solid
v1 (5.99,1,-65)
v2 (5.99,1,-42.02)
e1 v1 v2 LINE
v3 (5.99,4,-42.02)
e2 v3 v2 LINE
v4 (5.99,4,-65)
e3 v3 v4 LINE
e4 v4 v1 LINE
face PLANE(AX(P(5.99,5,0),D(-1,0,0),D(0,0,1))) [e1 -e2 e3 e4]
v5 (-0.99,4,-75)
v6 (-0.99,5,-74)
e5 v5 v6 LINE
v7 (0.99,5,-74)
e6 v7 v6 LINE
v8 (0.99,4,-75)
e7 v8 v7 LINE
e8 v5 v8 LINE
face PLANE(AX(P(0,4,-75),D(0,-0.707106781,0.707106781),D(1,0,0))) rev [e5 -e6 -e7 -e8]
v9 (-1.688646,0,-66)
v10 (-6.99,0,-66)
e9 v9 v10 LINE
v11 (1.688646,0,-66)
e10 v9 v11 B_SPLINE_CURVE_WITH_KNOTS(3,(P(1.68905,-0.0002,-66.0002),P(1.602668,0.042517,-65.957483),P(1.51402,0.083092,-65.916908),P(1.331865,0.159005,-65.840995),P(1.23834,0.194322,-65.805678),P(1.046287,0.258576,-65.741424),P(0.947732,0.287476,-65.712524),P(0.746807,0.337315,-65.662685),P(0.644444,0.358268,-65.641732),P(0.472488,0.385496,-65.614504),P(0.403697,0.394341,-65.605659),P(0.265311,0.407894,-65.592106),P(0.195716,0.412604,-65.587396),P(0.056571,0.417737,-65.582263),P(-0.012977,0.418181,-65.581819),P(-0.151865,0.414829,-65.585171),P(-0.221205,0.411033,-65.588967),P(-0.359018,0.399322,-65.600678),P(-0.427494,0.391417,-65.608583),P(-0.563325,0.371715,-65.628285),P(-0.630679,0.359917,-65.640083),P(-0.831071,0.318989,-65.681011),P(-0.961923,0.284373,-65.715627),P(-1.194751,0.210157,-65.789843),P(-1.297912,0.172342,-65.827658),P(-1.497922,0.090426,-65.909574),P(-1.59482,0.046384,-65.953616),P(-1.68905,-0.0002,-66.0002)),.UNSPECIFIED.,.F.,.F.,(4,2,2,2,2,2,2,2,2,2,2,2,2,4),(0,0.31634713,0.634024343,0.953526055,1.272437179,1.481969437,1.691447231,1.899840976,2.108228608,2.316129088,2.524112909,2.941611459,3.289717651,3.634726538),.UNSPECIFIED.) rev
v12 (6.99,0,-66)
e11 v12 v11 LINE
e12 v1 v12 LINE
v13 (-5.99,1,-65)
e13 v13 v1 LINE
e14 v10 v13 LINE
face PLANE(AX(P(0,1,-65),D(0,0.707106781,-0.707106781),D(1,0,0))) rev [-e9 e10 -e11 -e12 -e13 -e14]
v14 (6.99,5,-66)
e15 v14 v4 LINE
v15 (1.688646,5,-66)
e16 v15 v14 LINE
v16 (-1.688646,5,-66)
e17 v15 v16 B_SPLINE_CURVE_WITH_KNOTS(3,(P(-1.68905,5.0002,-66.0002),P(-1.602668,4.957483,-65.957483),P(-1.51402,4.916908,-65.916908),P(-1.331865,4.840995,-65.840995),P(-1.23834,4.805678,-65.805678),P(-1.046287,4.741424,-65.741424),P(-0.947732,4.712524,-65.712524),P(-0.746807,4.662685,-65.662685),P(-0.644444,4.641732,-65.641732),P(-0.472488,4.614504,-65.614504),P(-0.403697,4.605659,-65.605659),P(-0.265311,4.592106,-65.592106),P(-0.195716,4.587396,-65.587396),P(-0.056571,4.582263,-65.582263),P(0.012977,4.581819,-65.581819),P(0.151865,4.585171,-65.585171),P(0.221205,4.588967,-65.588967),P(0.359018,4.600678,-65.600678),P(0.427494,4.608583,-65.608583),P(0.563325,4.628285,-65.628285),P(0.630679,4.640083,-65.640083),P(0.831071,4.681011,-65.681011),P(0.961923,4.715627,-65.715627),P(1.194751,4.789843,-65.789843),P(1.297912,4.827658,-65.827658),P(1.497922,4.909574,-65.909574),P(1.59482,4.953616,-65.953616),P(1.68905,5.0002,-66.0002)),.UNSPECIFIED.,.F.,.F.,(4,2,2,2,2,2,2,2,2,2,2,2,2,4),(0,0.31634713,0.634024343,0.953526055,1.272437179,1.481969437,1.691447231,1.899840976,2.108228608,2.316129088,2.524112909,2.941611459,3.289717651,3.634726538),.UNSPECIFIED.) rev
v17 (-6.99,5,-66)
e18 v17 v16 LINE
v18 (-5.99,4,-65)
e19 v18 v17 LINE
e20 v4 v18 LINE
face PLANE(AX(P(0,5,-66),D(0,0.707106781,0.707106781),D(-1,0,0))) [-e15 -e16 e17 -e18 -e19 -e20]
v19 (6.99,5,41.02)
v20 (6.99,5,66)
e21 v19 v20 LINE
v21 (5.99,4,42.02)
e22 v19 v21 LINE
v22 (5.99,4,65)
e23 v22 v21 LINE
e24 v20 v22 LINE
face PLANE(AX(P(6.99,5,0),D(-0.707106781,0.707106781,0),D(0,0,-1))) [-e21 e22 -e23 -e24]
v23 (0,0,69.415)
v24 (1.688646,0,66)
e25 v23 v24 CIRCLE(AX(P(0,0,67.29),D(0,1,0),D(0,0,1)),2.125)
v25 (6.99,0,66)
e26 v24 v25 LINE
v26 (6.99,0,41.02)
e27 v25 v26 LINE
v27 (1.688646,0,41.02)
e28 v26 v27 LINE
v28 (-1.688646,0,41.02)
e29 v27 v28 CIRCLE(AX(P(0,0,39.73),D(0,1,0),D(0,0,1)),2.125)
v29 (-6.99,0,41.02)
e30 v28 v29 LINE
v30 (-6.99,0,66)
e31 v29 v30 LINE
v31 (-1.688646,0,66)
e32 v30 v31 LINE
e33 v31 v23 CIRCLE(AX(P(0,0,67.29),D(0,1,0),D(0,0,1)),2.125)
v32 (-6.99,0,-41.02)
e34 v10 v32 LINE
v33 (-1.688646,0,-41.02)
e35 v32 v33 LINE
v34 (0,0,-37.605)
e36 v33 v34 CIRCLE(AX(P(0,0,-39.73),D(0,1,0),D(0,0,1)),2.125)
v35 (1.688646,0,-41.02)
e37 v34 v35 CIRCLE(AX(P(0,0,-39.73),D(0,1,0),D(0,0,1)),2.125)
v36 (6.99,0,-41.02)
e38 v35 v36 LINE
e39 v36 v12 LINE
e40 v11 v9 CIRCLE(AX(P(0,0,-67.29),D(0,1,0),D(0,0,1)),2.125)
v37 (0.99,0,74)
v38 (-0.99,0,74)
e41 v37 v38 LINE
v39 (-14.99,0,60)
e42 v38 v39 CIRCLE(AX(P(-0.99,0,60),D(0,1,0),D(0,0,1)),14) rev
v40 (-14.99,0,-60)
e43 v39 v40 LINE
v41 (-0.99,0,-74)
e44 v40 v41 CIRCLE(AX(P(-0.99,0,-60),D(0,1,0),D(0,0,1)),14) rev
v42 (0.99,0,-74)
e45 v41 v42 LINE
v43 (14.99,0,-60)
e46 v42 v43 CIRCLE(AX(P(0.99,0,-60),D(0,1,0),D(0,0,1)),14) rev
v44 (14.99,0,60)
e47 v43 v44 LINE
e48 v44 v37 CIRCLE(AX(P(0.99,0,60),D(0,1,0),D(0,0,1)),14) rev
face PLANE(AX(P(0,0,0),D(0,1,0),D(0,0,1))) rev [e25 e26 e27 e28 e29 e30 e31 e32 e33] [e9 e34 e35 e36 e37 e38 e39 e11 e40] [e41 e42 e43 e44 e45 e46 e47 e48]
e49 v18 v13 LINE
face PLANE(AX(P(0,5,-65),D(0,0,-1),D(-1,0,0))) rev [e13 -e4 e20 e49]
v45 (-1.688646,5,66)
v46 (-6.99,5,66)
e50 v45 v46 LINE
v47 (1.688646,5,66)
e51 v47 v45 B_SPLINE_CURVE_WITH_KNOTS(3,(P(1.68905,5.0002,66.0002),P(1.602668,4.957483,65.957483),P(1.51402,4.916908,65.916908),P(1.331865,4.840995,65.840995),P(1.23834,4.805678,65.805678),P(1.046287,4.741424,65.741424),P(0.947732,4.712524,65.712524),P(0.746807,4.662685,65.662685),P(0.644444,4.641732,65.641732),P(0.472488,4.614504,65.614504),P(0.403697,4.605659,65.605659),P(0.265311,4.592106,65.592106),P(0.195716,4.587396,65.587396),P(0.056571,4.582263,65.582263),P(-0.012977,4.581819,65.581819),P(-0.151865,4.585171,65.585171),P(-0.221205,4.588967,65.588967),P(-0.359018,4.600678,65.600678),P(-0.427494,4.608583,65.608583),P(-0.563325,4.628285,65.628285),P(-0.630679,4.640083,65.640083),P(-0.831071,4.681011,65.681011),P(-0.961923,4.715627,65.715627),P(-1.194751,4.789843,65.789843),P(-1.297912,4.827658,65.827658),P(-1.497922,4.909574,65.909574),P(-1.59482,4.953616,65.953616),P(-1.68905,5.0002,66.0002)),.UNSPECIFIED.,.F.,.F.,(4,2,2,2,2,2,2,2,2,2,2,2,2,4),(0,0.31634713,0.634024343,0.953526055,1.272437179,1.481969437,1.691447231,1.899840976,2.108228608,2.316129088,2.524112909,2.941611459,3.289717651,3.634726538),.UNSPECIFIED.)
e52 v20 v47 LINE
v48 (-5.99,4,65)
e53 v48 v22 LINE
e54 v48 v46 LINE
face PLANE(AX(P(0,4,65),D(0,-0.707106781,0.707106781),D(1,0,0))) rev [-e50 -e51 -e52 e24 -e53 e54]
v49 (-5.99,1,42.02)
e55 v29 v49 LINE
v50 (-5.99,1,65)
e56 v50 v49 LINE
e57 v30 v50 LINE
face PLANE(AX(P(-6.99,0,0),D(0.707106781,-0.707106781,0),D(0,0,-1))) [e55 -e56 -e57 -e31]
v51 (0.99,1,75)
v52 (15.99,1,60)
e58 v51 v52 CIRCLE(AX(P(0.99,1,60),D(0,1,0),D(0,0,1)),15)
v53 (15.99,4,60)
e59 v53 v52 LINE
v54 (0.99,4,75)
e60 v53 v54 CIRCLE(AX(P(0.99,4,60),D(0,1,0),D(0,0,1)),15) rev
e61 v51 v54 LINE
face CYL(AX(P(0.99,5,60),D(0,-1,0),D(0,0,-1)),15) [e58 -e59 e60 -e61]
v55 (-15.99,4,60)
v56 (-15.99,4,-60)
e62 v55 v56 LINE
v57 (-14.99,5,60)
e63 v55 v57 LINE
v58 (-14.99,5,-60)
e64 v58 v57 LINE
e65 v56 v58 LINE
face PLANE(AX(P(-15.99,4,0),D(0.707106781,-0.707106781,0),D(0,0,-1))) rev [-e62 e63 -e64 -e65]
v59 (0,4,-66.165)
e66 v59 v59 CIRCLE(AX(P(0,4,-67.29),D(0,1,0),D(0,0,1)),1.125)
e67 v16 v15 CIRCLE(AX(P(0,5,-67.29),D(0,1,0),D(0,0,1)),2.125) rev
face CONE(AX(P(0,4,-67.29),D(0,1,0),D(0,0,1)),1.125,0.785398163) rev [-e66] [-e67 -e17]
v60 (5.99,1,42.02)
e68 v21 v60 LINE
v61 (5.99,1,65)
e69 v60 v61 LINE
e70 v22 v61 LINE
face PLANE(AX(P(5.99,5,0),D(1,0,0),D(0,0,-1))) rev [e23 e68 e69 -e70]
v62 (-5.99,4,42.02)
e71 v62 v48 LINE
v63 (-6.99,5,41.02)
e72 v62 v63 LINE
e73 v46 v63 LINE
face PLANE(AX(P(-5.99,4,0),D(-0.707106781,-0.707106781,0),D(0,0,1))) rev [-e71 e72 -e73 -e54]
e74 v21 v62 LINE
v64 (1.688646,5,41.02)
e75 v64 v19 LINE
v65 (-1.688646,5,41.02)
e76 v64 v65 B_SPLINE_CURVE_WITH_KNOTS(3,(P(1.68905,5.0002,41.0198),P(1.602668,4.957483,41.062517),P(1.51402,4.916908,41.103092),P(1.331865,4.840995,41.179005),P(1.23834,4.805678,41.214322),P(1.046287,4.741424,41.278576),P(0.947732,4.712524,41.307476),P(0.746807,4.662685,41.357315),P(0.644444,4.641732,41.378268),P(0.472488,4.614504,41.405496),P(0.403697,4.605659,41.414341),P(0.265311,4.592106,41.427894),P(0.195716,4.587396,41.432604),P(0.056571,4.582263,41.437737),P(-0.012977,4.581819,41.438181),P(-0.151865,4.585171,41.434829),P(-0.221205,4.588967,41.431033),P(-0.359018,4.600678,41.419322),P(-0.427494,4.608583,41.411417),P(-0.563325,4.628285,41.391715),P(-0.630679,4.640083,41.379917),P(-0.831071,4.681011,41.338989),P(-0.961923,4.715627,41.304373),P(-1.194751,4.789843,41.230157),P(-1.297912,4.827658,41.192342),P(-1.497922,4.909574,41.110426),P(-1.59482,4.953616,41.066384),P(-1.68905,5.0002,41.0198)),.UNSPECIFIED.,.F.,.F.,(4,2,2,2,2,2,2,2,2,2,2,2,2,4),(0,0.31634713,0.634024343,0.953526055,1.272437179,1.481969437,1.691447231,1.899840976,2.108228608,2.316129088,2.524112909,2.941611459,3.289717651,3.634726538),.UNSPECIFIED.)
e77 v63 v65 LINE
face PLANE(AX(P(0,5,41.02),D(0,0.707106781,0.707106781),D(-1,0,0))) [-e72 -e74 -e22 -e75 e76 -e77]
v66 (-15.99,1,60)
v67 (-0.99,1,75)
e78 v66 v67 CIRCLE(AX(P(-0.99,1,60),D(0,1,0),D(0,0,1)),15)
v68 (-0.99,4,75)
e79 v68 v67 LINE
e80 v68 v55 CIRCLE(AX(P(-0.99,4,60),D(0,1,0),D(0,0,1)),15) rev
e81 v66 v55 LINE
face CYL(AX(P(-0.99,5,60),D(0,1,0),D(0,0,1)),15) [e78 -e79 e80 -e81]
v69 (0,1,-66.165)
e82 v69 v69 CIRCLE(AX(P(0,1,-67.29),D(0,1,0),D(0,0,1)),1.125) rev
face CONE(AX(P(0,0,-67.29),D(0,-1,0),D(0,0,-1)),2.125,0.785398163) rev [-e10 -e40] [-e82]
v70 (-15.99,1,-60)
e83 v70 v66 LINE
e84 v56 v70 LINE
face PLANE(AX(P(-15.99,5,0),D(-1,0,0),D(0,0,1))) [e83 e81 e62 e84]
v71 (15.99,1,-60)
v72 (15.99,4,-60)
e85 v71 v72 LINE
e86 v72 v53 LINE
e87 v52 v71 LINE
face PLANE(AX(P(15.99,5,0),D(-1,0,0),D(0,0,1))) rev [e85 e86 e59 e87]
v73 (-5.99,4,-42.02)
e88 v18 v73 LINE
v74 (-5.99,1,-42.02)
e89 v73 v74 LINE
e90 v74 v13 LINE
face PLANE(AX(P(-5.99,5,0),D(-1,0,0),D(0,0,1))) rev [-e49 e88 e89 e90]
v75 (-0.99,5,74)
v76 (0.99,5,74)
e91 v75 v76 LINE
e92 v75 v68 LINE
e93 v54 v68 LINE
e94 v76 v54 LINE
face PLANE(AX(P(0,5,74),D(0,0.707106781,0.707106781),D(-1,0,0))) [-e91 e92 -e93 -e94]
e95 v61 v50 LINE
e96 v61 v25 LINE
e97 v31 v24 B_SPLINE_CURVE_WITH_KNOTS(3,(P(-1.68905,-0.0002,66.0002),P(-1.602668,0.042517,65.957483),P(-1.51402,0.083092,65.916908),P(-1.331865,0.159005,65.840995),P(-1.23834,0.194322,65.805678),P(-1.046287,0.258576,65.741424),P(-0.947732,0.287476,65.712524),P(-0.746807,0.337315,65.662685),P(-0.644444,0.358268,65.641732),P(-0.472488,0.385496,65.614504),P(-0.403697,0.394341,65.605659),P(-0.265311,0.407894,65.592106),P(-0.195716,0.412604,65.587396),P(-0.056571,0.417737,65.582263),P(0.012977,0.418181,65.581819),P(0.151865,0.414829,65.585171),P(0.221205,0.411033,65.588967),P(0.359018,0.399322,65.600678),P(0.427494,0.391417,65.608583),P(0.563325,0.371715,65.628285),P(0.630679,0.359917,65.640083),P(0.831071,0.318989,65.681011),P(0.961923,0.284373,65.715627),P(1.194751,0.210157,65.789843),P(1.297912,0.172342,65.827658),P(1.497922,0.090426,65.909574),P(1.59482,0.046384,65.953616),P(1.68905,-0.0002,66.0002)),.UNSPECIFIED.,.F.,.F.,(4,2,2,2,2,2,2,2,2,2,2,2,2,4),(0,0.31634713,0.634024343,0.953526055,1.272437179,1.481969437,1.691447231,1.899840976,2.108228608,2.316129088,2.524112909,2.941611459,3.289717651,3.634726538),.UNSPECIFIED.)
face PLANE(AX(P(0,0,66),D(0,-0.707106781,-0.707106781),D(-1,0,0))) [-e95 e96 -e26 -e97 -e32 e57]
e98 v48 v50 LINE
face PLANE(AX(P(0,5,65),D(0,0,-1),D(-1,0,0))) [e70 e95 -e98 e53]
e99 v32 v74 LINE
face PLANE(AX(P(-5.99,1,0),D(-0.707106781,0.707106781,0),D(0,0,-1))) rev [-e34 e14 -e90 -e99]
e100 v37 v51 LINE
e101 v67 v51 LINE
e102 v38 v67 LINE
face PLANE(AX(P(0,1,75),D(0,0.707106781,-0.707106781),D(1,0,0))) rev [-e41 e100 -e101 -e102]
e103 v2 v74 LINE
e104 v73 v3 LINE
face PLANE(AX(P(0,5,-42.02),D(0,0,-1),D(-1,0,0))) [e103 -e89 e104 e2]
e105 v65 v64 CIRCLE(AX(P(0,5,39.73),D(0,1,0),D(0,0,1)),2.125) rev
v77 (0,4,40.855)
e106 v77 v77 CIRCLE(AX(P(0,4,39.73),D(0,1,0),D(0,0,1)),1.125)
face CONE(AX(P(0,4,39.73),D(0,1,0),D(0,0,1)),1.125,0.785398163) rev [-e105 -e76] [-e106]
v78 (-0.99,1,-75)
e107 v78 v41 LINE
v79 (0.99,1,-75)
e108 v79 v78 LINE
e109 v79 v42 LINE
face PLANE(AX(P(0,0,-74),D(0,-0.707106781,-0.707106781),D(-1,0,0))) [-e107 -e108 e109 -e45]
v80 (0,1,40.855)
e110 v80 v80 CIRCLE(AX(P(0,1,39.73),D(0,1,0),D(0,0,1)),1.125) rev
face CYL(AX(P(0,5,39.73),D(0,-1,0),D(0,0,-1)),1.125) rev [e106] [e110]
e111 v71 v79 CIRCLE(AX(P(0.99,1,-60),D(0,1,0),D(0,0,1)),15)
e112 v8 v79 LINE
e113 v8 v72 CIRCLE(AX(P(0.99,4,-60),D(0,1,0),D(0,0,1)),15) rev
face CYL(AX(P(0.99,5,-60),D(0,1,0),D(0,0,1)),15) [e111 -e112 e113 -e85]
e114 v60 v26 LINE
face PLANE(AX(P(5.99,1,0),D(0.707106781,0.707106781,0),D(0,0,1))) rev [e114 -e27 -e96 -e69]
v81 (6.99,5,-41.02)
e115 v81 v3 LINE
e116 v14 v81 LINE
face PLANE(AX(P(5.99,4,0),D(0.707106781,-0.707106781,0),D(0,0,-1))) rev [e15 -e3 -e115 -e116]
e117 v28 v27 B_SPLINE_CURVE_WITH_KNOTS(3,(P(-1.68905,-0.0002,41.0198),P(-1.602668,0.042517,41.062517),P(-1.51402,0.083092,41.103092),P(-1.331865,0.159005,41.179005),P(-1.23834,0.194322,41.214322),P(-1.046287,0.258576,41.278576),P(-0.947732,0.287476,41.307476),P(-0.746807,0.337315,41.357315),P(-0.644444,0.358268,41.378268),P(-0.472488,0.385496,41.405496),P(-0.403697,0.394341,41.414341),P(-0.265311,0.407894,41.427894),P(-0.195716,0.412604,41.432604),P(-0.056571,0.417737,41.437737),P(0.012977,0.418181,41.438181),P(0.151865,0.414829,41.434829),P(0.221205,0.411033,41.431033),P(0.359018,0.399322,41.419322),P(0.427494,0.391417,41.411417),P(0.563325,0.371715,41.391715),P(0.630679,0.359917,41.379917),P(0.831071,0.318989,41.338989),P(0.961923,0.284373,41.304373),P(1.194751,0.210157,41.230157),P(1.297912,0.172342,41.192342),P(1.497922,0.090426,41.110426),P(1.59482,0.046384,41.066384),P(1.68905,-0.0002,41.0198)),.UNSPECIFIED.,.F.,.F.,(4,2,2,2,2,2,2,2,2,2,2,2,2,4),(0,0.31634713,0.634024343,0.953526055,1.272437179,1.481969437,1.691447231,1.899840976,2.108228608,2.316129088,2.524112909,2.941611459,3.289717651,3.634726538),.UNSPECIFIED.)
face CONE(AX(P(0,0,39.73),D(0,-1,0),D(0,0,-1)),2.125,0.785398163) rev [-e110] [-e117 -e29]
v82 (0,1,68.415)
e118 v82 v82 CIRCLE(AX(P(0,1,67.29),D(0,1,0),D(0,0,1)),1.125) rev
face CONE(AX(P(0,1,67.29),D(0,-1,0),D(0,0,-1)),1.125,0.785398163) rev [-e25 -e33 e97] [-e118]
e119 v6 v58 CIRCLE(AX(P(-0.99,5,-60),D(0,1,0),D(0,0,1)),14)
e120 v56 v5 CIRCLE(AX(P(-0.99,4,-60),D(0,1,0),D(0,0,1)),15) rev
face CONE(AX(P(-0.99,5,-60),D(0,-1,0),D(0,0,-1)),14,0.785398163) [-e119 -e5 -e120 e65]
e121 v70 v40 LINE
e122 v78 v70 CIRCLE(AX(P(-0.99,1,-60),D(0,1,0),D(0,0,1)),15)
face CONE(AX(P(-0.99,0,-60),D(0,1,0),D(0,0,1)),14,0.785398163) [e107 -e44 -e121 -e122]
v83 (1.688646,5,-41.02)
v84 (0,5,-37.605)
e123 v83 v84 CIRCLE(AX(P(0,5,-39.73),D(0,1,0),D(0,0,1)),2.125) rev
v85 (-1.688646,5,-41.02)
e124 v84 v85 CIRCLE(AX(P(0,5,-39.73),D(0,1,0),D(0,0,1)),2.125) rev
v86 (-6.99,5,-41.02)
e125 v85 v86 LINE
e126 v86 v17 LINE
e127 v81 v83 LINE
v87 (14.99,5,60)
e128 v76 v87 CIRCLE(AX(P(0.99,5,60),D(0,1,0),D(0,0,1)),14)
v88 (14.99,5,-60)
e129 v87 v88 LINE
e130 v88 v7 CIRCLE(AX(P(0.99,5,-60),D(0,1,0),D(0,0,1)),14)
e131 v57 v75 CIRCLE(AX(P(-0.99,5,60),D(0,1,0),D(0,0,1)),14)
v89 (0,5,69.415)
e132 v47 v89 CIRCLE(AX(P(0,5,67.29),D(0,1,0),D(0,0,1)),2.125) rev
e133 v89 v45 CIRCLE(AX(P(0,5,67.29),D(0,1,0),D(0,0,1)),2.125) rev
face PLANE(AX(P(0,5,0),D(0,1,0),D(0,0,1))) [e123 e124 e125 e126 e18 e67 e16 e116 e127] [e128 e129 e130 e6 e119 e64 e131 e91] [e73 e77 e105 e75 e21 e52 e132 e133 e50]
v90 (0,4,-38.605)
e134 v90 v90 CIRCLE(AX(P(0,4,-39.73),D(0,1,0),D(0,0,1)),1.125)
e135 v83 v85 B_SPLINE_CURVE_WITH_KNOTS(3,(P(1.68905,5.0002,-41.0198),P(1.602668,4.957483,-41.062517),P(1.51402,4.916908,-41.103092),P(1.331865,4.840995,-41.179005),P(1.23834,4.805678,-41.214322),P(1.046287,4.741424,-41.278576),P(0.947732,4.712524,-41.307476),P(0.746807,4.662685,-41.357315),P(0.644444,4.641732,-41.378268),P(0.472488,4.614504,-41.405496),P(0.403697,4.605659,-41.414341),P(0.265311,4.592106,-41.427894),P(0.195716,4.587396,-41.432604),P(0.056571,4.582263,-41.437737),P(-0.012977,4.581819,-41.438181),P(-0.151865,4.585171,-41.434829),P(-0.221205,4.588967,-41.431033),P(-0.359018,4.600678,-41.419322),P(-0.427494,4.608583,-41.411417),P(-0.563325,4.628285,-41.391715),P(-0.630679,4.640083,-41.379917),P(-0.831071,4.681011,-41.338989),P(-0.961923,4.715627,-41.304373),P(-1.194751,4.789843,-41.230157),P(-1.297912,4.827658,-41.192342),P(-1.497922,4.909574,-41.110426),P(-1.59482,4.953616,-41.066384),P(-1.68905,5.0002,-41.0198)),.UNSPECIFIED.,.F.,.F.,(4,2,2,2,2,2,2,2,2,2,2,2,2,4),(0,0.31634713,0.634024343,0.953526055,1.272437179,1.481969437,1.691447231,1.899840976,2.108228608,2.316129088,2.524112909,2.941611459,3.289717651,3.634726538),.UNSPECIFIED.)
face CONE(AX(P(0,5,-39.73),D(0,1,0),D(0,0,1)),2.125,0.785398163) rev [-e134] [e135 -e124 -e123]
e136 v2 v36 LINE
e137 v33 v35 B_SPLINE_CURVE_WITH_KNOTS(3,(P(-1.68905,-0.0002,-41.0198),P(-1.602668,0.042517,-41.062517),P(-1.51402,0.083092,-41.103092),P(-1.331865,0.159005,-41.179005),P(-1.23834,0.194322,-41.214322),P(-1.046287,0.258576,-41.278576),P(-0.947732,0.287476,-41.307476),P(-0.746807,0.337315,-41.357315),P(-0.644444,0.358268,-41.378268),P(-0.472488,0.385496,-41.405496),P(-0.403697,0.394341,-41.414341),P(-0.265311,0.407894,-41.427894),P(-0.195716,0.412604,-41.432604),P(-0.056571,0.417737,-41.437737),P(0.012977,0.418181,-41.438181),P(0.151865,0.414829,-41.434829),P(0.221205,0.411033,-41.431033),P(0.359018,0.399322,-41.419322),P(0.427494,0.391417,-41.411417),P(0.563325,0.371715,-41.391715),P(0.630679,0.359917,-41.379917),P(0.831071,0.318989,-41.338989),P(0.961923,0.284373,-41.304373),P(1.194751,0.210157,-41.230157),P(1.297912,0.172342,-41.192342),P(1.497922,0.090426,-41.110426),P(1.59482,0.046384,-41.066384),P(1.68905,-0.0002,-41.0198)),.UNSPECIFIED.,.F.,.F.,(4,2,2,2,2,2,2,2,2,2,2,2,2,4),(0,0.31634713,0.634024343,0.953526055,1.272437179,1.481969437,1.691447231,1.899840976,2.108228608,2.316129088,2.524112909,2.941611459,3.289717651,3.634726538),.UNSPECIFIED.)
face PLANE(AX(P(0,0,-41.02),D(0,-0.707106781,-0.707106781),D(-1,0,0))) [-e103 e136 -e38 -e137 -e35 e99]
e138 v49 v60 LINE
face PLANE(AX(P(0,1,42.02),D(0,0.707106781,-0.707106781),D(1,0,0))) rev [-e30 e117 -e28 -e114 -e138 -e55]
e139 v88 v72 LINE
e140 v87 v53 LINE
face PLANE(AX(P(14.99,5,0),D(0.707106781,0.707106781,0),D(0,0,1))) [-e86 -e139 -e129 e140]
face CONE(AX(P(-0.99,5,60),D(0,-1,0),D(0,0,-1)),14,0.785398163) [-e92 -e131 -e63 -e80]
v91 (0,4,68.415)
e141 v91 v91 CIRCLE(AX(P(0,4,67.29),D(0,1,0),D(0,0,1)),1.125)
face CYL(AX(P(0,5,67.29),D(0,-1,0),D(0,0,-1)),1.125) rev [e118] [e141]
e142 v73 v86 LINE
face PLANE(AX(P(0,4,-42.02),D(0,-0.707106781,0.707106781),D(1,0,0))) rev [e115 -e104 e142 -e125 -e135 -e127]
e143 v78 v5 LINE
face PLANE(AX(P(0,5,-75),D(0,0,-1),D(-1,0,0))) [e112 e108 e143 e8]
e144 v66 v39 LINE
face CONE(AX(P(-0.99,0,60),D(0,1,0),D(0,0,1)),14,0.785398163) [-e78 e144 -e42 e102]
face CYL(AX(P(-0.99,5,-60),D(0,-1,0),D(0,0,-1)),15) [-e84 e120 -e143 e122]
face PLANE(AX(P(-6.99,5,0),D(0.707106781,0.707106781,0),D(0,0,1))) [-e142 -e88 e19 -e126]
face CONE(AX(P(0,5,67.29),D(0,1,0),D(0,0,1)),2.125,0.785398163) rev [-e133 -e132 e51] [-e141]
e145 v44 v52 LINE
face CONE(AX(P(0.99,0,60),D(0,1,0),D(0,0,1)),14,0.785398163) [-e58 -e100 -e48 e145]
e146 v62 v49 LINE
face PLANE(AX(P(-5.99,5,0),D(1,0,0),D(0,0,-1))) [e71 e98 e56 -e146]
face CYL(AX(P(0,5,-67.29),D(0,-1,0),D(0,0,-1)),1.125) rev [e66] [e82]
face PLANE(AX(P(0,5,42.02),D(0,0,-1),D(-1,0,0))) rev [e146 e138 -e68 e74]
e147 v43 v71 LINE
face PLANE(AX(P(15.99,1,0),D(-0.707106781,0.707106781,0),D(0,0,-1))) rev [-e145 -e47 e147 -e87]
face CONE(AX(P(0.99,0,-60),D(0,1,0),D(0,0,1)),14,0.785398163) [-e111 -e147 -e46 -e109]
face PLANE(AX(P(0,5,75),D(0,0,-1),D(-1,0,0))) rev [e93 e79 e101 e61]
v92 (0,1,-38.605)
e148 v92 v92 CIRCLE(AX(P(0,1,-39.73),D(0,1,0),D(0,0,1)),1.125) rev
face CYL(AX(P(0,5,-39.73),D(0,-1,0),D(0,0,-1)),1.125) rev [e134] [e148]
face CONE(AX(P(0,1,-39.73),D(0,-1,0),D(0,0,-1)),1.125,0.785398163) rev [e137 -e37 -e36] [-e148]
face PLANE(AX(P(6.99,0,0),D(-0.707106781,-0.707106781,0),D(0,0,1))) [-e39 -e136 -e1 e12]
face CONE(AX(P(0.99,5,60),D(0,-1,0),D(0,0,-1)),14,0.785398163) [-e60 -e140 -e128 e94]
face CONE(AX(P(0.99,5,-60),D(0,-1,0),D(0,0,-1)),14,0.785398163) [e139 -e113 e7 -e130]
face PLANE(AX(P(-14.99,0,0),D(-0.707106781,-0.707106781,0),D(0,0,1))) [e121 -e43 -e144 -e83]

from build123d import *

# Parameters (mm, degrees)
SKETCH3_W           = 31.98
SKETCH3_H           = 150
SKETCH3_R           = 1.125
SKETCH3_W_2         = 11.98
SKETCH3_H_2         = 22.98
BOSS_EXTRUDE1_DEPTH = 5
FILLET1_R           = 15
CHAMFER1_SIZE       = 1


with BuildPart() as part:
    # Sketch3 → Boss-Extrude1 (new body)
    with BuildSketch(Plane(origin=(0, 0, 0), x_dir=(1, 0, 0), z_dir=(0, 1, 0))):
        Rectangle(SKETCH3_W, SKETCH3_H)
        with Locations(Location((0, 67.29, 0), (0, 0, 270))):
            Circle(SKETCH3_R, mode=Mode.SUBTRACT)
        with Locations(Location((0, 39.73, 0), (0, 0, 270))):
            Circle(SKETCH3_R, mode=Mode.SUBTRACT)
        with Locations(Location((0, -67.29, 0), (0, 0, 270))):
            Circle(SKETCH3_R, mode=Mode.SUBTRACT)
        with Locations(Location((0, -39.73, 0), (0, 0, 270))):
            Circle(SKETCH3_R, mode=Mode.SUBTRACT)
        with Locations((0, 53.51)):
            Rectangle(SKETCH3_W_2, SKETCH3_H_2, mode=Mode.SUBTRACT)
        with Locations((0, -53.51)):
            Rectangle(SKETCH3_W_2, SKETCH3_H_2, mode=Mode.SUBTRACT)
    extrude(amount=BOSS_EXTRUDE1_DEPTH)

    # Fillet1
    fillet1_edges = [part.edges().sort_by_distance(p)[0] for p in [
        (-15.99, 2.5, -75),
        (15.99, 2.5, -75),
        (15.99, 2.5, 75),
        (-15.99, 2.5, 75),
    ]]
    fillet(fillet1_edges, radius=FILLET1_R)

    # Chamfer1
    # the kernel refuses this chamfer: 1 mm, written as the material it takes off along each edge
    with BuildSketch(Plane(origin=(0, 0, 67.29), x_dir=(0, 0, 1), z_dir=(-1, 0, 0))) as chamfer1_piece_1:
        Polygon((1.125 + CHAMFER1_SIZE, 0), (1.125, CHAMFER1_SIZE), (1.125, 0), align=None)
    revolve(axis=Axis((0, 0, 67.29), (0, 1, 0)), mode=Mode.SUBTRACT)
    with BuildSketch(Plane(origin=(5.99, 0, 65), x_dir=(1.1857664299965085e-15, -0.027495876610586483, 0.9996219169112968), z_dir=(-1, 0, 0)), Plane(origin=(-5.99, 0, 42.02), x_dir=(0, -0.027495876610586292, -0.9996219169112968), z_dir=(1, 0, 0)), Plane(origin=(-5.99, 5, -42.02), x_dir=(0, 0.027495876610586414, 0.9996219169112968), z_dir=(1, 0, 0)), Plane(origin=(5.99, 5, -65), x_dir=(1.1857664299965085e-15, 0.027495876610586605, -0.9996219169112968), z_dir=(-1, 0, 0))) as chamfer1_piece_2:
        Polygon((CHAMFER1_SIZE * 0.999621916911, CHAMFER1_SIZE * 0.0274958766106), (-CHAMFER1_SIZE * 0.0274958766106, CHAMFER1_SIZE * 0.999621916911), (0, 0), align=None)
    extrude(amount=11.98, mode=Mode.SUBTRACT)
    with BuildSketch(Plane(origin=(5.99, 0, 42.02), x_dir=(0.9996219169112968, -0.027495876610586365, 0), z_dir=(0, 0, 1)), Plane(origin=(-5.99, 0, 65), x_dir=(-0.9996219169112968, -0.027495876610586365, 0), z_dir=(0, 0, -1)), Plane(origin=(5.99, 5, -42.02), x_dir=(0.9996219169112968, 0.027495876610586487, 0), z_dir=(0, 0, -1)), Plane(origin=(-5.99, 5, -65), x_dir=(-0.9996219169112968, 0.027495876610586487, 0), z_dir=(0, 0, 1))) as chamfer1_piece_3:
        Polygon((CHAMFER1_SIZE * 0.999621916911, CHAMFER1_SIZE * 0.0274958766106), (-CHAMFER1_SIZE * 0.0274958766106, CHAMFER1_SIZE * 0.999621916911), (0, 0), align=None)
    extrude(amount=22.98, mode=Mode.SUBTRACT)
    with BuildSketch(Plane(origin=(0, 0, 39.73), x_dir=(0, 0, 1), z_dir=(-1, 0, 0))) as chamfer1_piece_4:
        Polygon((1.125 + CHAMFER1_SIZE, 0), (1.125, CHAMFER1_SIZE), (1.125, 0), align=None)
    revolve(axis=Axis((0, 0, 39.73), (0, 1, 0)), mode=Mode.SUBTRACT)
    with BuildSketch(Plane(origin=(0, 0, -39.73), x_dir=(0, 0, 1), z_dir=(-1, 0, 0))) as chamfer1_piece_5:
        Polygon((1.125 + CHAMFER1_SIZE, 0), (1.125, CHAMFER1_SIZE), (1.125, 0), align=None)
    revolve(axis=Axis((0, 0, -39.73), (0, 1, 0)), mode=Mode.SUBTRACT)
    with BuildSketch(Plane(origin=(0, 0, -67.29), x_dir=(0, 0, 1), z_dir=(-1, 0, 0))) as chamfer1_piece_6:
        Polygon((1.125 + CHAMFER1_SIZE, 0), (1.125, CHAMFER1_SIZE), (1.125, 0), align=None)
    revolve(axis=Axis((0, 0, -67.29), (0, 1, 0)), mode=Mode.SUBTRACT)
    with BuildSketch(Plane(origin=(5.99, 0, -65), x_dir=(1.1857664299965085e-15, -0.027495876610586483, -0.9996219169112968), z_dir=(-1, 0, 0)), Plane(origin=(-5.99, 0, -42.02), x_dir=(0, -0.027495876610586292, 0.9996219169112968), z_dir=(1, 0, 0)), Plane(origin=(-5.99, 5, 42.02), x_dir=(0, 0.027495876610586414, -0.9996219169112968), z_dir=(1, 0, 0)), Plane(origin=(5.99, 5, 65), x_dir=(1.1857664299965085e-15, 0.027495876610586605, 0.9996219169112968), z_dir=(-1, 0, 0))) as chamfer1_piece_7:
        Polygon((CHAMFER1_SIZE * 0.999621916911, -CHAMFER1_SIZE * 0.0274958766106), (-CHAMFER1_SIZE * 0.0274958766106, -CHAMFER1_SIZE * 0.999621916911), (0, 0), align=None)
    extrude(amount=11.98, mode=Mode.SUBTRACT)
    with BuildSketch(Plane(origin=(-5.99, 0, -65), x_dir=(-0.9996219169112968, -0.027495876610586365, 0), z_dir=(0, 0, 1)), Plane(origin=(5.99, 0, -42.02), x_dir=(0.9996219169112968, -0.027495876610586365, 0), z_dir=(0, 0, -1)), Plane(origin=(-5.99, 5, 65), x_dir=(-0.9996219169112968, 0.027495876610586487, 0), z_dir=(0, 0, -1)), Plane(origin=(5.99, 5, 42.02), x_dir=(0.9996219169112968, 0.027495876610586487, 0), z_dir=(0, 0, 1))) as chamfer1_piece_8:
        Polygon((CHAMFER1_SIZE * 0.999621916911, -CHAMFER1_SIZE * 0.0274958766106), (-CHAMFER1_SIZE * 0.0274958766106, -CHAMFER1_SIZE * 0.999621916911), (0, 0), align=None)
    extrude(amount=22.98, mode=Mode.SUBTRACT)
    with BuildSketch(Plane(origin=(-15.99, 0, 60), x_dir=(-0.027495876610587354, 0.9996219169112968, 0), z_dir=(0, 0, -1)), Plane(origin=(15.99, 5, -60), x_dir=(-0.9996219169112968, 0.02749587661058651, 0), z_dir=(0, 0, 1))) as chamfer1_piece_9:
        Polygon((CHAMFER1_SIZE * 0.999621916911, CHAMFER1_SIZE * 0.0274958766106), (-CHAMFER1_SIZE * 0.0274958766106, CHAMFER1_SIZE * 0.999621916911), (0, 0), align=None)
    extrude(amount=120, mode=Mode.SUBTRACT)
    with BuildSketch(Plane(origin=(-15.99, 5, 60), x_dir=(-0.02749587661058735, -0.9996219169112968, 0), z_dir=(0, 0, -1)), Plane(origin=(15.99, 0, -60), x_dir=(-0.9996219169112968, -0.02749587661058639, 0), z_dir=(0, 0, 1))) as chamfer1_piece_10:
        Polygon((CHAMFER1_SIZE * 0.999621916911, -CHAMFER1_SIZE * 0.0274958766106), (-CHAMFER1_SIZE * 0.0274958766106, -CHAMFER1_SIZE * 0.999621916911), (0, 0), align=None)
    extrude(amount=120, mode=Mode.SUBTRACT)
    with BuildSketch(Plane(origin=(0, 5, -67.29), x_dir=(0, 0, 1), z_dir=(-1, 0, 0))) as chamfer1_piece_11:
        Polygon((1.125 + CHAMFER1_SIZE, 0), (1.125, -CHAMFER1_SIZE), (1.125, 0), align=None)
    revolve(axis=Axis((0, 5, -67.29), (0, 1, 0)), mode=Mode.SUBTRACT)
    with BuildSketch(Plane(origin=(-0.99, 0, -75), x_dir=(0, -0.027495876610586483, 0.9996219169112968), z_dir=(1, 0, 0)), Plane(origin=(0.99, 0, 75), x_dir=(0, -0.027495876610586483, -0.9996219169112968), z_dir=(-1, 0, 0))) as chamfer1_piece_12:
        Polygon((CHAMFER1_SIZE * 0.999621916911, -CHAMFER1_SIZE * 0.0274958766106), (-CHAMFER1_SIZE * 0.0274958766106, -CHAMFER1_SIZE * 0.999621916911), (0, 0), align=None)
    extrude(amount=1.98, mode=Mode.SUBTRACT)
    with BuildSketch(Plane(origin=(0.99, 0, 60), x_dir=(1, 0, 0), z_dir=(0, 0, -1))) as chamfer1_piece_13:
        Polygon((15 - CHAMFER1_SIZE, 0), (15, -CHAMFER1_SIZE), (15, 0), align=None)
    revolve(axis=Axis((0.99, 0, 60), (0, -1, 0)), revolution_arc=90, mode=Mode.SUBTRACT)
    with BuildSketch(Plane(origin=(-0.99, 0, 60), x_dir=(-1, 0, 0), z_dir=(0, 0, -1))) as chamfer1_piece_14:
        Polygon((15 - CHAMFER1_SIZE, 0), (15, CHAMFER1_SIZE), (15, 0), align=None)
    revolve(axis=Axis((-0.99, 0, 60), (0, 1, 0)), revolution_arc=90, mode=Mode.SUBTRACT)
    with BuildSketch(Plane(origin=(0.99, 0, -60), x_dir=(0, 0, -1), z_dir=(-1, 0, 0))) as chamfer1_piece_15:
        Polygon((15 - CHAMFER1_SIZE, 0), (15, -CHAMFER1_SIZE), (15, 0), align=None)
    revolve(axis=Axis((0.99, 0, -60), (0, -1, 0)), revolution_arc=90, mode=Mode.SUBTRACT)
    with BuildSketch(Plane(origin=(0, 5, -39.73), x_dir=(0, 0, 1), z_dir=(-1, 0, 0))) as chamfer1_piece_16:
        Polygon((1.125 + CHAMFER1_SIZE, 0), (1.125, -CHAMFER1_SIZE), (1.125, 0), align=None)
    revolve(axis=Axis((0, 5, -39.73), (0, 1, 0)), mode=Mode.SUBTRACT)
    with BuildSketch(Plane(origin=(-0.99, 0, -60), x_dir=(-1, 0, 0), z_dir=(0, 0, 1))) as chamfer1_piece_17:
        Polygon((15 - CHAMFER1_SIZE, 0), (15, -CHAMFER1_SIZE), (15, 0), align=None)
    revolve(axis=Axis((-0.99, 0, -60), (0, -1, 0)), revolution_arc=90, mode=Mode.SUBTRACT)
    with BuildSketch(Plane(origin=(-0.99, 5, -75), x_dir=(0, 0.027495876610586605, 0.9996219169112968), z_dir=(1, 0, 0)), Plane(origin=(0.99, 5, 75), x_dir=(0, 0.027495876610586605, -0.9996219169112968), z_dir=(-1, 0, 0))) as chamfer1_piece_18:
        Polygon((CHAMFER1_SIZE * 0.999621916911, CHAMFER1_SIZE * 0.0274958766106), (-CHAMFER1_SIZE * 0.0274958766106, CHAMFER1_SIZE * 0.999621916911), (0, 0), align=None)
    extrude(amount=1.98, mode=Mode.SUBTRACT)
    with BuildSketch(Plane(origin=(0.99, 5, 60), x_dir=(1, 0, 0), z_dir=(0, 0, -1))) as chamfer1_piece_19:
        Polygon((15 - CHAMFER1_SIZE, 0), (15, CHAMFER1_SIZE), (15, 0), align=None)
    revolve(axis=Axis((0.99, 5, 60), (0, -1, 0)), revolution_arc=90, mode=Mode.SUBTRACT)
    with BuildSketch(Plane(origin=(-0.99, 5, 60), x_dir=(-1, 0, 0), z_dir=(0, 0, -1))) as chamfer1_piece_20:
        Polygon((15, -CHAMFER1_SIZE), (15 - CHAMFER1_SIZE, 0), (15, 0), align=None)
    revolve(axis=Axis((-0.99, 5, 60), (0, 1, 0)), revolution_arc=90, mode=Mode.SUBTRACT)
    with BuildSketch(Plane(origin=(0, 5, 39.73), x_dir=(0, 0, 1), z_dir=(-1, 0, 0))) as chamfer1_piece_21:
        Polygon((1.125 + CHAMFER1_SIZE, 0), (1.125, -CHAMFER1_SIZE), (1.125, 0), align=None)
    revolve(axis=Axis((0, 5, 39.73), (0, 1, 0)), mode=Mode.SUBTRACT)
    with BuildSketch(Plane(origin=(0.99, 5, -60), x_dir=(0, 0, -1), z_dir=(-1, 0, 0))) as chamfer1_piece_22:
        Polygon((15 - CHAMFER1_SIZE, 0), (15, CHAMFER1_SIZE), (15, 0), align=None)
    revolve(axis=Axis((0.99, 5, -60), (0, -1, 0)), revolution_arc=90, mode=Mode.SUBTRACT)
    with BuildSketch(Plane(origin=(-0.99, 5, -60), x_dir=(-1, 0, 0), z_dir=(0, 0, 1))) as chamfer1_piece_23:
        Polygon((15, CHAMFER1_SIZE), (15 - CHAMFER1_SIZE, 0), (15, 0), align=None)
    revolve(axis=Axis((-0.99, 5, -60), (0, -1, 0)), revolution_arc=90, mode=Mode.SUBTRACT)
    with BuildSketch(Plane(origin=(0, 5, 67.29), x_dir=(0, 0, 1), z_dir=(-1, 0, 0))) as chamfer1_piece_24:
        Polygon((1.125 + CHAMFER1_SIZE, 0), (1.125, -CHAMFER1_SIZE), (1.125, 0), align=None)
    revolve(axis=Axis((0, 5, 67.29), (0, 1, 0)), mode=Mode.SUBTRACT)
    with BuildSketch(Plane(origin=(8.561682988, 0, 65), x_dir=(1.1857664299965085e-15, -0.027495876610586483, 0.9996219169112968), z_dir=(-1, 0, 0))) as chamfer1_piece_25a_section:
        Polygon((CHAMFER1_SIZE * 0.999621916911, CHAMFER1_SIZE * 0.0274958766106), (-CHAMFER1_SIZE * 0.0274958766106, CHAMFER1_SIZE * 0.999621916911), (0, 0), align=None)
    chamfer1_piece_25a = extrude(amount=14.551682988, mode=Mode.PRIVATE)
    chamfer1_piece_25a = split(chamfer1_piece_25a, bisect_by=Plane(origin=(5.99, 0.329793627, 65.329793627), z_dir=(1, 0, 0)), keep=Keep.TOP, mode=Mode.PRIVATE)
    with BuildSketch(Plane(origin=(5.99, 0, 42.02), x_dir=(0.9996219169112968, -0.027495876610586365, 0), z_dir=(0, 0, 1))) as chamfer1_piece_25b_section:
        Polygon((CHAMFER1_SIZE * 0.999621916911, CHAMFER1_SIZE * 0.0274958766106), (-CHAMFER1_SIZE * 0.0274958766106, CHAMFER1_SIZE * 0.999621916911), (0, 0), align=None)
    chamfer1_piece_25b = extrude(amount=25.551682988, mode=Mode.PRIVATE)
    chamfer1_piece_25b = split(chamfer1_piece_25b, bisect_by=Plane(origin=(6.319793627, 0.329793627, 65), z_dir=(0, 0, 1)), keep=Keep.TOP, mode=Mode.PRIVATE)
    chamfer1_piece_25 = chamfer1_piece_25a & chamfer1_piece_25b
    add(chamfer1_piece_25, mode=Mode.SUBTRACT)
    with BuildSketch(Plane(origin=(-5.99, 0, 67.571682988), x_dir=(-0.9996219169112968, -0.027495876610586365, 0), z_dir=(0, 0, -1))) as chamfer1_piece_26a_section:
        Polygon((CHAMFER1_SIZE * 0.999621916911, CHAMFER1_SIZE * 0.0274958766106), (-CHAMFER1_SIZE * 0.0274958766106, CHAMFER1_SIZE * 0.999621916911), (0, 0), align=None)
    chamfer1_piece_26a = extrude(amount=25.551682988, mode=Mode.PRIVATE)
    chamfer1_piece_26a = split(chamfer1_piece_26a, bisect_by=Plane(origin=(-6.319793627, 0.329793627, 65), z_dir=(0, 0, 1)), keep=Keep.TOP, mode=Mode.PRIVATE)
    with BuildSketch(Plane(origin=(5.99, 0, 65), x_dir=(1.1857664299965085e-15, -0.027495876610586483, 0.9996219169112968), z_dir=(-1, 0, 0))) as chamfer1_piece_26b_section:
        Polygon((CHAMFER1_SIZE * 0.999621916911, CHAMFER1_SIZE * 0.0274958766106), (-CHAMFER1_SIZE * 0.0274958766106, CHAMFER1_SIZE * 0.999621916911), (0, 0), align=None)
    chamfer1_piece_26b = extrude(amount=14.551682988, mode=Mode.PRIVATE)
    chamfer1_piece_26b = split(chamfer1_piece_26b, bisect_by=Plane(origin=(-5.99, 0.329793627, 65.329793627), z_dir=(-1, 0, 0)), keep=Keep.TOP, mode=Mode.PRIVATE)
    chamfer1_piece_26 = chamfer1_piece_26a & chamfer1_piece_26b
    add(chamfer1_piece_26, mode=Mode.SUBTRACT)
    with BuildSketch(Plane(origin=(-5.99, 0, 42.02), x_dir=(0, -0.027495876610586292, -0.9996219169112968), z_dir=(1, 0, 0))) as chamfer1_piece_27a_section:
        Polygon((CHAMFER1_SIZE * 0.999621916911, CHAMFER1_SIZE * 0.0274958766106), (-CHAMFER1_SIZE * 0.0274958766106, CHAMFER1_SIZE * 0.999621916911), (0, 0), align=None)
    chamfer1_piece_27a = extrude(amount=14.551682988, mode=Mode.PRIVATE)
    chamfer1_piece_27a = split(chamfer1_piece_27a, bisect_by=Plane(origin=(5.99, 0.329793627, 41.690206373), z_dir=(1, 0, 0)), keep=Keep.TOP, mode=Mode.PRIVATE)
    with BuildSketch(Plane(origin=(5.99, 0, 39.448317012), x_dir=(0.9996219169112968, -0.027495876610586365, 0), z_dir=(0, 0, 1))) as chamfer1_piece_27b_section:
        Polygon((CHAMFER1_SIZE * 0.999621916911, CHAMFER1_SIZE * 0.0274958766106), (-CHAMFER1_SIZE * 0.0274958766106, CHAMFER1_SIZE * 0.999621916911), (0, 0), align=None)
    chamfer1_piece_27b = extrude(amount=25.551682988, mode=Mode.PRIVATE)
    chamfer1_piece_27b = split(chamfer1_piece_27b, bisect_by=Plane(origin=(6.319793627, 0.329793627, 42.02), z_dir=(0, 0, -1)), keep=Keep.TOP, mode=Mode.PRIVATE)
    chamfer1_piece_27 = chamfer1_piece_27a & chamfer1_piece_27b
    add(chamfer1_piece_27, mode=Mode.SUBTRACT)
    with BuildSketch(Plane(origin=(-8.561682988, 0, 42.02), x_dir=(0, -0.027495876610586292, -0.9996219169112968), z_dir=(1, 0, 0))) as chamfer1_piece_28a_section:
        Polygon((CHAMFER1_SIZE * 0.999621916911, CHAMFER1_SIZE * 0.0274958766106), (-CHAMFER1_SIZE * 0.0274958766106, CHAMFER1_SIZE * 0.999621916911), (0, 0), align=None)
    chamfer1_piece_28a = extrude(amount=14.551682988, mode=Mode.PRIVATE)
    chamfer1_piece_28a = split(chamfer1_piece_28a, bisect_by=Plane(origin=(-5.99, 0.329793627, 41.690206373), z_dir=(-1, 0, 0)), keep=Keep.TOP, mode=Mode.PRIVATE)
    with BuildSketch(Plane(origin=(-5.99, 0, 65), x_dir=(-0.9996219169112968, -0.027495876610586365, 0), z_dir=(0, 0, -1))) as chamfer1_piece_28b_section:
        Polygon((CHAMFER1_SIZE * 0.999621916911, CHAMFER1_SIZE * 0.0274958766106), (-CHAMFER1_SIZE * 0.0274958766106, CHAMFER1_SIZE * 0.999621916911), (0, 0), align=None)
    chamfer1_piece_28b = extrude(amount=25.551682988, mode=Mode.PRIVATE)
    chamfer1_piece_28b = split(chamfer1_piece_28b, bisect_by=Plane(origin=(-6.319793627, 0.329793627, 42.02), z_dir=(0, 0, -1)), keep=Keep.TOP, mode=Mode.PRIVATE)
    chamfer1_piece_28 = chamfer1_piece_28a & chamfer1_piece_28b
    add(chamfer1_piece_28, mode=Mode.SUBTRACT)
    with BuildSketch(Plane(origin=(5.99, 0, -42.02), x_dir=(0.9996219169112968, -0.027495876610586365, 0), z_dir=(0, 0, -1))) as chamfer1_piece_29a_section:
        Polygon((CHAMFER1_SIZE * 0.999621916911, -CHAMFER1_SIZE * 0.0274958766106), (-CHAMFER1_SIZE * 0.0274958766106, -CHAMFER1_SIZE * 0.999621916911), (0, 0), align=None)
    chamfer1_piece_29a = extrude(amount=25.551682988, mode=Mode.PRIVATE)
    chamfer1_piece_29a = split(chamfer1_piece_29a, bisect_by=Plane(origin=(6.319793627, 0.329793627, -65), z_dir=(0, 0, -1)), keep=Keep.TOP, mode=Mode.PRIVATE)
    with BuildSketch(Plane(origin=(8.561682988, 0, -65), x_dir=(1.1857664299965085e-15, -0.027495876610586483, -0.9996219169112968), z_dir=(-1, 0, 0))) as chamfer1_piece_29b_section:
        Polygon((CHAMFER1_SIZE * 0.999621916911, -CHAMFER1_SIZE * 0.0274958766106), (-CHAMFER1_SIZE * 0.0274958766106, -CHAMFER1_SIZE * 0.999621916911), (0, 0), align=None)
    chamfer1_piece_29b = extrude(amount=14.551682988, mode=Mode.PRIVATE)
    chamfer1_piece_29b = split(chamfer1_piece_29b, bisect_by=Plane(origin=(5.99, 0.329793627, -65.329793627), z_dir=(1, 0, 0)), keep=Keep.TOP, mode=Mode.PRIVATE)
    chamfer1_piece_29 = chamfer1_piece_29a & chamfer1_piece_29b
    add(chamfer1_piece_29, mode=Mode.SUBTRACT)
    with BuildSketch(Plane(origin=(5.99, 0, -65), x_dir=(1.1857664299965085e-15, -0.027495876610586483, -0.9996219169112968), z_dir=(-1, 0, 0))) as chamfer1_piece_30a_section:
        Polygon((CHAMFER1_SIZE * 0.999621916911, -CHAMFER1_SIZE * 0.0274958766106), (-CHAMFER1_SIZE * 0.0274958766106, -CHAMFER1_SIZE * 0.999621916911), (0, 0), align=None)
    chamfer1_piece_30a = extrude(amount=14.551682988, mode=Mode.PRIVATE)
    chamfer1_piece_30a = split(chamfer1_piece_30a, bisect_by=Plane(origin=(-5.99, 0.329793627, -65.329793627), z_dir=(-1, 0, 0)), keep=Keep.TOP, mode=Mode.PRIVATE)
    with BuildSketch(Plane(origin=(-5.99, 0, -67.571682988), x_dir=(-0.9996219169112968, -0.027495876610586365, 0), z_dir=(0, 0, 1))) as chamfer1_piece_30b_section:
        Polygon((CHAMFER1_SIZE * 0.999621916911, -CHAMFER1_SIZE * 0.0274958766106), (-CHAMFER1_SIZE * 0.0274958766106, -CHAMFER1_SIZE * 0.999621916911), (0, 0), align=None)
    chamfer1_piece_30b = extrude(amount=25.551682988, mode=Mode.PRIVATE)
    chamfer1_piece_30b = split(chamfer1_piece_30b, bisect_by=Plane(origin=(-6.319793627, 0.329793627, -65), z_dir=(0, 0, -1)), keep=Keep.TOP, mode=Mode.PRIVATE)
    chamfer1_piece_30 = chamfer1_piece_30a & chamfer1_piece_30b
    add(chamfer1_piece_30, mode=Mode.SUBTRACT)
    with BuildSketch(Plane(origin=(-8.561682988, 0, -42.02), x_dir=(0, -0.027495876610586292, 0.9996219169112968), z_dir=(1, 0, 0))) as chamfer1_piece_31a_section:
        Polygon((CHAMFER1_SIZE * 0.999621916911, -CHAMFER1_SIZE * 0.0274958766106), (-CHAMFER1_SIZE * 0.0274958766106, -CHAMFER1_SIZE * 0.999621916911), (0, 0), align=None)
    chamfer1_piece_31a = extrude(amount=14.551682988, mode=Mode.PRIVATE)
    chamfer1_piece_31a = split(chamfer1_piece_31a, bisect_by=Plane(origin=(-5.99, 0.329793627, -41.690206373), z_dir=(-1, 0, 0)), keep=Keep.TOP, mode=Mode.PRIVATE)
    with BuildSketch(Plane(origin=(-5.99, 0, -65), x_dir=(-0.9996219169112968, -0.027495876610586365, 0), z_dir=(0, 0, 1))) as chamfer1_piece_31b_section:
        Polygon((CHAMFER1_SIZE * 0.999621916911, -CHAMFER1_SIZE * 0.0274958766106), (-CHAMFER1_SIZE * 0.0274958766106, -CHAMFER1_SIZE * 0.999621916911), (0, 0), align=None)
    chamfer1_piece_31b = extrude(amount=25.551682988, mode=Mode.PRIVATE)
    chamfer1_piece_31b = split(chamfer1_piece_31b, bisect_by=Plane(origin=(-6.319793627, 0.329793627, -42.02), z_dir=(0, 0, 1)), keep=Keep.TOP, mode=Mode.PRIVATE)
    chamfer1_piece_31 = chamfer1_piece_31a & chamfer1_piece_31b
    add(chamfer1_piece_31, mode=Mode.SUBTRACT)
    with BuildSketch(Plane(origin=(-5.99, 0, -42.02), x_dir=(0, -0.027495876610586292, 0.9996219169112968), z_dir=(1, 0, 0))) as chamfer1_piece_32a_section:
        Polygon((CHAMFER1_SIZE * 0.999621916911, -CHAMFER1_SIZE * 0.0274958766106), (-CHAMFER1_SIZE * 0.0274958766106, -CHAMFER1_SIZE * 0.999621916911), (0, 0), align=None)
    chamfer1_piece_32a = extrude(amount=14.551682988, mode=Mode.PRIVATE)
    chamfer1_piece_32a = split(chamfer1_piece_32a, bisect_by=Plane(origin=(5.99, 0.329793627, -41.690206373), z_dir=(1, 0, 0)), keep=Keep.TOP, mode=Mode.PRIVATE)
    with BuildSketch(Plane(origin=(5.99, 0, -39.448317012), x_dir=(0.9996219169112968, -0.027495876610586365, 0), z_dir=(0, 0, -1))) as chamfer1_piece_32b_section:
        Polygon((CHAMFER1_SIZE * 0.999621916911, -CHAMFER1_SIZE * 0.0274958766106), (-CHAMFER1_SIZE * 0.0274958766106, -CHAMFER1_SIZE * 0.999621916911), (0, 0), align=None)
    chamfer1_piece_32b = extrude(amount=25.551682988, mode=Mode.PRIVATE)
    chamfer1_piece_32b = split(chamfer1_piece_32b, bisect_by=Plane(origin=(6.319793627, 0.329793627, -42.02), z_dir=(0, 0, 1)), keep=Keep.TOP, mode=Mode.PRIVATE)
    chamfer1_piece_32 = chamfer1_piece_32a & chamfer1_piece_32b
    add(chamfer1_piece_32, mode=Mode.SUBTRACT)
    with BuildSketch(Plane(origin=(-5.99, 5, -42.02), x_dir=(0, 0.027495876610586414, 0.9996219169112968), z_dir=(1, 0, 0))) as chamfer1_piece_33a_section:
        Polygon((CHAMFER1_SIZE * 0.999621916911, CHAMFER1_SIZE * 0.0274958766106), (-CHAMFER1_SIZE * 0.0274958766106, CHAMFER1_SIZE * 0.999621916911), (0, 0), align=None)
    chamfer1_piece_33a = extrude(amount=14.551682988, mode=Mode.PRIVATE)
    chamfer1_piece_33a = split(chamfer1_piece_33a, bisect_by=Plane(origin=(5.99, 4.670206373, -41.690206373), z_dir=(1, 0, 0)), keep=Keep.TOP, mode=Mode.PRIVATE)
    with BuildSketch(Plane(origin=(5.99, 5, -39.448317012), x_dir=(0.9996219169112968, 0.027495876610586487, 0), z_dir=(0, 0, -1))) as chamfer1_piece_33b_section:
        Polygon((CHAMFER1_SIZE * 0.999621916911, CHAMFER1_SIZE * 0.0274958766106), (-CHAMFER1_SIZE * 0.0274958766106, CHAMFER1_SIZE * 0.999621916911), (0, 0), align=None)
    chamfer1_piece_33b = extrude(amount=25.551682988, mode=Mode.PRIVATE)
    chamfer1_piece_33b = split(chamfer1_piece_33b, bisect_by=Plane(origin=(6.319793627, 4.670206373, -42.02), z_dir=(0, 0, 1)), keep=Keep.TOP, mode=Mode.PRIVATE)
    chamfer1_piece_33 = chamfer1_piece_33a & chamfer1_piece_33b
    add(chamfer1_piece_33, mode=Mode.SUBTRACT)
    with BuildSketch(Plane(origin=(5.99, 5, -42.02), x_dir=(0.9996219169112968, 0.027495876610586487, 0), z_dir=(0, 0, -1))) as chamfer1_piece_34a_section:
        Polygon((CHAMFER1_SIZE * 0.999621916911, CHAMFER1_SIZE * 0.0274958766106), (-CHAMFER1_SIZE * 0.0274958766106, CHAMFER1_SIZE * 0.999621916911), (0, 0), align=None)
    chamfer1_piece_34a = extrude(amount=25.551682988, mode=Mode.PRIVATE)
    chamfer1_piece_34a = split(chamfer1_piece_34a, bisect_by=Plane(origin=(6.319793627, 4.670206373, -65), z_dir=(0, 0, -1)), keep=Keep.TOP, mode=Mode.PRIVATE)
    with BuildSketch(Plane(origin=(8.561682988, 5, -65), x_dir=(1.1857664299965085e-15, 0.027495876610586605, -0.9996219169112968), z_dir=(-1, 0, 0))) as chamfer1_piece_34b_section:
        Polygon((CHAMFER1_SIZE * 0.999621916911, CHAMFER1_SIZE * 0.0274958766106), (-CHAMFER1_SIZE * 0.0274958766106, CHAMFER1_SIZE * 0.999621916911), (0, 0), align=None)
    chamfer1_piece_34b = extrude(amount=14.551682988, mode=Mode.PRIVATE)
    chamfer1_piece_34b = split(chamfer1_piece_34b, bisect_by=Plane(origin=(5.99, 4.670206373, -65.329793627), z_dir=(1, 0, 0)), keep=Keep.TOP, mode=Mode.PRIVATE)
    chamfer1_piece_34 = chamfer1_piece_34a & chamfer1_piece_34b
    add(chamfer1_piece_34, mode=Mode.SUBTRACT)
    with BuildSketch(Plane(origin=(-8.561682988, 5, -42.02), x_dir=(0, 0.027495876610586414, 0.9996219169112968), z_dir=(1, 0, 0))) as chamfer1_piece_35a_section:
        Polygon((CHAMFER1_SIZE * 0.999621916911, CHAMFER1_SIZE * 0.0274958766106), (-CHAMFER1_SIZE * 0.0274958766106, CHAMFER1_SIZE * 0.999621916911), (0, 0), align=None)
    chamfer1_piece_35a = extrude(amount=14.551682988, mode=Mode.PRIVATE)
    chamfer1_piece_35a = split(chamfer1_piece_35a, bisect_by=Plane(origin=(-5.99, 4.670206373, -41.690206373), z_dir=(-1, 0, 0)), keep=Keep.TOP, mode=Mode.PRIVATE)
    with BuildSketch(Plane(origin=(-5.99, 5, -65), x_dir=(-0.9996219169112968, 0.027495876610586487, 0), z_dir=(0, 0, 1))) as chamfer1_piece_35b_section:
        Polygon((CHAMFER1_SIZE * 0.999621916911, CHAMFER1_SIZE * 0.0274958766106), (-CHAMFER1_SIZE * 0.0274958766106, CHAMFER1_SIZE * 0.999621916911), (0, 0), align=None)
    chamfer1_piece_35b = extrude(amount=25.551682988, mode=Mode.PRIVATE)
    chamfer1_piece_35b = split(chamfer1_piece_35b, bisect_by=Plane(origin=(-6.319793627, 4.670206373, -42.02), z_dir=(0, 0, 1)), keep=Keep.TOP, mode=Mode.PRIVATE)
    chamfer1_piece_35 = chamfer1_piece_35a & chamfer1_piece_35b
    add(chamfer1_piece_35, mode=Mode.SUBTRACT)
    with BuildSketch(Plane(origin=(5.99, 5, -65), x_dir=(1.1857664299965085e-15, 0.027495876610586605, -0.9996219169112968), z_dir=(-1, 0, 0))) as chamfer1_piece_36a_section:
        Polygon((CHAMFER1_SIZE * 0.999621916911, CHAMFER1_SIZE * 0.0274958766106), (-CHAMFER1_SIZE * 0.0274958766106, CHAMFER1_SIZE * 0.999621916911), (0, 0), align=None)
    chamfer1_piece_36a = extrude(amount=14.551682988, mode=Mode.PRIVATE)
    chamfer1_piece_36a = split(chamfer1_piece_36a, bisect_by=Plane(origin=(-5.99, 4.670206373, -65.329793627), z_dir=(-1, 0, 0)), keep=Keep.TOP, mode=Mode.PRIVATE)
    with BuildSketch(Plane(origin=(-5.99, 5, -67.571682988), x_dir=(-0.9996219169112968, 0.027495876610586487, 0), z_dir=(0, 0, 1))) as chamfer1_piece_36b_section:
        Polygon((CHAMFER1_SIZE * 0.999621916911, CHAMFER1_SIZE * 0.0274958766106), (-CHAMFER1_SIZE * 0.0274958766106, CHAMFER1_SIZE * 0.999621916911), (0, 0), align=None)
    chamfer1_piece_36b = extrude(amount=25.551682988, mode=Mode.PRIVATE)
    chamfer1_piece_36b = split(chamfer1_piece_36b, bisect_by=Plane(origin=(-6.319793627, 4.670206373, -65), z_dir=(0, 0, -1)), keep=Keep.TOP, mode=Mode.PRIVATE)
    chamfer1_piece_36 = chamfer1_piece_36a & chamfer1_piece_36b
    add(chamfer1_piece_36, mode=Mode.SUBTRACT)
    with BuildSketch(Plane(origin=(-5.99, 5, 67.571682988), x_dir=(-0.9996219169112968, 0.027495876610586487, 0), z_dir=(0, 0, -1))) as chamfer1_piece_37a_section:
        Polygon((CHAMFER1_SIZE * 0.999621916911, -CHAMFER1_SIZE * 0.0274958766106), (-CHAMFER1_SIZE * 0.0274958766106, -CHAMFER1_SIZE * 0.999621916911), (0, 0), align=None)
    chamfer1_piece_37a = extrude(amount=25.551682988, mode=Mode.PRIVATE)
    chamfer1_piece_37a = split(chamfer1_piece_37a, bisect_by=Plane(origin=(-6.319793627, 4.670206373, 65), z_dir=(0, 0, 1)), keep=Keep.TOP, mode=Mode.PRIVATE)
    with BuildSketch(Plane(origin=(5.99, 5, 65), x_dir=(1.1857664299965085e-15, 0.027495876610586605, 0.9996219169112968), z_dir=(-1, 0, 0))) as chamfer1_piece_37b_section:
        Polygon((CHAMFER1_SIZE * 0.999621916911, -CHAMFER1_SIZE * 0.0274958766106), (-CHAMFER1_SIZE * 0.0274958766106, -CHAMFER1_SIZE * 0.999621916911), (0, 0), align=None)
    chamfer1_piece_37b = extrude(amount=14.551682988, mode=Mode.PRIVATE)
    chamfer1_piece_37b = split(chamfer1_piece_37b, bisect_by=Plane(origin=(-5.99, 4.670206373, 65.329793627), z_dir=(-1, 0, 0)), keep=Keep.TOP, mode=Mode.PRIVATE)
    chamfer1_piece_37 = chamfer1_piece_37a & chamfer1_piece_37b
    add(chamfer1_piece_37, mode=Mode.SUBTRACT)
    with BuildSketch(Plane(origin=(-8.561682988, 5, 42.02), x_dir=(0, 0.027495876610586414, -0.9996219169112968), z_dir=(1, 0, 0))) as chamfer1_piece_38a_section:
        Polygon((CHAMFER1_SIZE * 0.999621916911, -CHAMFER1_SIZE * 0.0274958766106), (-CHAMFER1_SIZE * 0.0274958766106, -CHAMFER1_SIZE * 0.999621916911), (0, 0), align=None)
    chamfer1_piece_38a = extrude(amount=14.551682988, mode=Mode.PRIVATE)
    chamfer1_piece_38a = split(chamfer1_piece_38a, bisect_by=Plane(origin=(-5.99, 4.670206373, 41.690206373), z_dir=(-1, 0, 0)), keep=Keep.TOP, mode=Mode.PRIVATE)
    with BuildSketch(Plane(origin=(-5.99, 5, 65), x_dir=(-0.9996219169112968, 0.027495876610586487, 0), z_dir=(0, 0, -1))) as chamfer1_piece_38b_section:
        Polygon((CHAMFER1_SIZE * 0.999621916911, -CHAMFER1_SIZE * 0.0274958766106), (-CHAMFER1_SIZE * 0.0274958766106, -CHAMFER1_SIZE * 0.999621916911), (0, 0), align=None)
    chamfer1_piece_38b = extrude(amount=25.551682988, mode=Mode.PRIVATE)
    chamfer1_piece_38b = split(chamfer1_piece_38b, bisect_by=Plane(origin=(-6.319793627, 4.670206373, 42.02), z_dir=(0, 0, -1)), keep=Keep.TOP, mode=Mode.PRIVATE)
    chamfer1_piece_38 = chamfer1_piece_38a & chamfer1_piece_38b
    add(chamfer1_piece_38, mode=Mode.SUBTRACT)
    with BuildSketch(Plane(origin=(-5.99, 5, 42.02), x_dir=(0, 0.027495876610586414, -0.9996219169112968), z_dir=(1, 0, 0))) as chamfer1_piece_39a_section:
        Polygon((CHAMFER1_SIZE * 0.999621916911, -CHAMFER1_SIZE * 0.0274958766106), (-CHAMFER1_SIZE * 0.0274958766106, -CHAMFER1_SIZE * 0.999621916911), (0, 0), align=None)
    chamfer1_piece_39a = extrude(amount=14.551682988, mode=Mode.PRIVATE)
    chamfer1_piece_39a = split(chamfer1_piece_39a, bisect_by=Plane(origin=(5.99, 4.670206373, 41.690206373), z_dir=(1, 0, 0)), keep=Keep.TOP, mode=Mode.PRIVATE)
    with BuildSketch(Plane(origin=(5.99, 5, 39.448317012), x_dir=(0.9996219169112968, 0.027495876610586487, 0), z_dir=(0, 0, 1))) as chamfer1_piece_39b_section:
        Polygon((CHAMFER1_SIZE * 0.999621916911, -CHAMFER1_SIZE * 0.0274958766106), (-CHAMFER1_SIZE * 0.0274958766106, -CHAMFER1_SIZE * 0.999621916911), (0, 0), align=None)
    chamfer1_piece_39b = extrude(amount=25.551682988, mode=Mode.PRIVATE)
    chamfer1_piece_39b = split(chamfer1_piece_39b, bisect_by=Plane(origin=(6.319793627, 4.670206373, 42.02), z_dir=(0, 0, -1)), keep=Keep.TOP, mode=Mode.PRIVATE)
    chamfer1_piece_39 = chamfer1_piece_39a & chamfer1_piece_39b
    add(chamfer1_piece_39, mode=Mode.SUBTRACT)
    with BuildSketch(Plane(origin=(8.561682988, 5, 65), x_dir=(1.1857664299965085e-15, 0.027495876610586605, 0.9996219169112968), z_dir=(-1, 0, 0))) as chamfer1_piece_40a_section:
        Polygon((CHAMFER1_SIZE * 0.999621916911, -CHAMFER1_SIZE * 0.0274958766106), (-CHAMFER1_SIZE * 0.0274958766106, -CHAMFER1_SIZE * 0.999621916911), (0, 0), align=None)
    chamfer1_piece_40a = extrude(amount=14.551682988, mode=Mode.PRIVATE)
    chamfer1_piece_40a = split(chamfer1_piece_40a, bisect_by=Plane(origin=(5.99, 4.670206373, 65.329793627), z_dir=(1, 0, 0)), keep=Keep.TOP, mode=Mode.PRIVATE)
    with BuildSketch(Plane(origin=(5.99, 5, 42.02), x_dir=(0.9996219169112968, 0.027495876610586487, 0), z_dir=(0, 0, 1))) as chamfer1_piece_40b_section:
        Polygon((CHAMFER1_SIZE * 0.999621916911, -CHAMFER1_SIZE * 0.0274958766106), (-CHAMFER1_SIZE * 0.0274958766106, -CHAMFER1_SIZE * 0.999621916911), (0, 0), align=None)
    chamfer1_piece_40b = extrude(amount=25.551682988, mode=Mode.PRIVATE)
    chamfer1_piece_40b = split(chamfer1_piece_40b, bisect_by=Plane(origin=(6.319793627, 4.670206373, 65), z_dir=(0, 0, 1)), keep=Keep.TOP, mode=Mode.PRIVATE)
    chamfer1_piece_40 = chamfer1_piece_40a & chamfer1_piece_40b
    add(chamfer1_piece_40, mode=Mode.SUBTRACT)


solid = part.part
